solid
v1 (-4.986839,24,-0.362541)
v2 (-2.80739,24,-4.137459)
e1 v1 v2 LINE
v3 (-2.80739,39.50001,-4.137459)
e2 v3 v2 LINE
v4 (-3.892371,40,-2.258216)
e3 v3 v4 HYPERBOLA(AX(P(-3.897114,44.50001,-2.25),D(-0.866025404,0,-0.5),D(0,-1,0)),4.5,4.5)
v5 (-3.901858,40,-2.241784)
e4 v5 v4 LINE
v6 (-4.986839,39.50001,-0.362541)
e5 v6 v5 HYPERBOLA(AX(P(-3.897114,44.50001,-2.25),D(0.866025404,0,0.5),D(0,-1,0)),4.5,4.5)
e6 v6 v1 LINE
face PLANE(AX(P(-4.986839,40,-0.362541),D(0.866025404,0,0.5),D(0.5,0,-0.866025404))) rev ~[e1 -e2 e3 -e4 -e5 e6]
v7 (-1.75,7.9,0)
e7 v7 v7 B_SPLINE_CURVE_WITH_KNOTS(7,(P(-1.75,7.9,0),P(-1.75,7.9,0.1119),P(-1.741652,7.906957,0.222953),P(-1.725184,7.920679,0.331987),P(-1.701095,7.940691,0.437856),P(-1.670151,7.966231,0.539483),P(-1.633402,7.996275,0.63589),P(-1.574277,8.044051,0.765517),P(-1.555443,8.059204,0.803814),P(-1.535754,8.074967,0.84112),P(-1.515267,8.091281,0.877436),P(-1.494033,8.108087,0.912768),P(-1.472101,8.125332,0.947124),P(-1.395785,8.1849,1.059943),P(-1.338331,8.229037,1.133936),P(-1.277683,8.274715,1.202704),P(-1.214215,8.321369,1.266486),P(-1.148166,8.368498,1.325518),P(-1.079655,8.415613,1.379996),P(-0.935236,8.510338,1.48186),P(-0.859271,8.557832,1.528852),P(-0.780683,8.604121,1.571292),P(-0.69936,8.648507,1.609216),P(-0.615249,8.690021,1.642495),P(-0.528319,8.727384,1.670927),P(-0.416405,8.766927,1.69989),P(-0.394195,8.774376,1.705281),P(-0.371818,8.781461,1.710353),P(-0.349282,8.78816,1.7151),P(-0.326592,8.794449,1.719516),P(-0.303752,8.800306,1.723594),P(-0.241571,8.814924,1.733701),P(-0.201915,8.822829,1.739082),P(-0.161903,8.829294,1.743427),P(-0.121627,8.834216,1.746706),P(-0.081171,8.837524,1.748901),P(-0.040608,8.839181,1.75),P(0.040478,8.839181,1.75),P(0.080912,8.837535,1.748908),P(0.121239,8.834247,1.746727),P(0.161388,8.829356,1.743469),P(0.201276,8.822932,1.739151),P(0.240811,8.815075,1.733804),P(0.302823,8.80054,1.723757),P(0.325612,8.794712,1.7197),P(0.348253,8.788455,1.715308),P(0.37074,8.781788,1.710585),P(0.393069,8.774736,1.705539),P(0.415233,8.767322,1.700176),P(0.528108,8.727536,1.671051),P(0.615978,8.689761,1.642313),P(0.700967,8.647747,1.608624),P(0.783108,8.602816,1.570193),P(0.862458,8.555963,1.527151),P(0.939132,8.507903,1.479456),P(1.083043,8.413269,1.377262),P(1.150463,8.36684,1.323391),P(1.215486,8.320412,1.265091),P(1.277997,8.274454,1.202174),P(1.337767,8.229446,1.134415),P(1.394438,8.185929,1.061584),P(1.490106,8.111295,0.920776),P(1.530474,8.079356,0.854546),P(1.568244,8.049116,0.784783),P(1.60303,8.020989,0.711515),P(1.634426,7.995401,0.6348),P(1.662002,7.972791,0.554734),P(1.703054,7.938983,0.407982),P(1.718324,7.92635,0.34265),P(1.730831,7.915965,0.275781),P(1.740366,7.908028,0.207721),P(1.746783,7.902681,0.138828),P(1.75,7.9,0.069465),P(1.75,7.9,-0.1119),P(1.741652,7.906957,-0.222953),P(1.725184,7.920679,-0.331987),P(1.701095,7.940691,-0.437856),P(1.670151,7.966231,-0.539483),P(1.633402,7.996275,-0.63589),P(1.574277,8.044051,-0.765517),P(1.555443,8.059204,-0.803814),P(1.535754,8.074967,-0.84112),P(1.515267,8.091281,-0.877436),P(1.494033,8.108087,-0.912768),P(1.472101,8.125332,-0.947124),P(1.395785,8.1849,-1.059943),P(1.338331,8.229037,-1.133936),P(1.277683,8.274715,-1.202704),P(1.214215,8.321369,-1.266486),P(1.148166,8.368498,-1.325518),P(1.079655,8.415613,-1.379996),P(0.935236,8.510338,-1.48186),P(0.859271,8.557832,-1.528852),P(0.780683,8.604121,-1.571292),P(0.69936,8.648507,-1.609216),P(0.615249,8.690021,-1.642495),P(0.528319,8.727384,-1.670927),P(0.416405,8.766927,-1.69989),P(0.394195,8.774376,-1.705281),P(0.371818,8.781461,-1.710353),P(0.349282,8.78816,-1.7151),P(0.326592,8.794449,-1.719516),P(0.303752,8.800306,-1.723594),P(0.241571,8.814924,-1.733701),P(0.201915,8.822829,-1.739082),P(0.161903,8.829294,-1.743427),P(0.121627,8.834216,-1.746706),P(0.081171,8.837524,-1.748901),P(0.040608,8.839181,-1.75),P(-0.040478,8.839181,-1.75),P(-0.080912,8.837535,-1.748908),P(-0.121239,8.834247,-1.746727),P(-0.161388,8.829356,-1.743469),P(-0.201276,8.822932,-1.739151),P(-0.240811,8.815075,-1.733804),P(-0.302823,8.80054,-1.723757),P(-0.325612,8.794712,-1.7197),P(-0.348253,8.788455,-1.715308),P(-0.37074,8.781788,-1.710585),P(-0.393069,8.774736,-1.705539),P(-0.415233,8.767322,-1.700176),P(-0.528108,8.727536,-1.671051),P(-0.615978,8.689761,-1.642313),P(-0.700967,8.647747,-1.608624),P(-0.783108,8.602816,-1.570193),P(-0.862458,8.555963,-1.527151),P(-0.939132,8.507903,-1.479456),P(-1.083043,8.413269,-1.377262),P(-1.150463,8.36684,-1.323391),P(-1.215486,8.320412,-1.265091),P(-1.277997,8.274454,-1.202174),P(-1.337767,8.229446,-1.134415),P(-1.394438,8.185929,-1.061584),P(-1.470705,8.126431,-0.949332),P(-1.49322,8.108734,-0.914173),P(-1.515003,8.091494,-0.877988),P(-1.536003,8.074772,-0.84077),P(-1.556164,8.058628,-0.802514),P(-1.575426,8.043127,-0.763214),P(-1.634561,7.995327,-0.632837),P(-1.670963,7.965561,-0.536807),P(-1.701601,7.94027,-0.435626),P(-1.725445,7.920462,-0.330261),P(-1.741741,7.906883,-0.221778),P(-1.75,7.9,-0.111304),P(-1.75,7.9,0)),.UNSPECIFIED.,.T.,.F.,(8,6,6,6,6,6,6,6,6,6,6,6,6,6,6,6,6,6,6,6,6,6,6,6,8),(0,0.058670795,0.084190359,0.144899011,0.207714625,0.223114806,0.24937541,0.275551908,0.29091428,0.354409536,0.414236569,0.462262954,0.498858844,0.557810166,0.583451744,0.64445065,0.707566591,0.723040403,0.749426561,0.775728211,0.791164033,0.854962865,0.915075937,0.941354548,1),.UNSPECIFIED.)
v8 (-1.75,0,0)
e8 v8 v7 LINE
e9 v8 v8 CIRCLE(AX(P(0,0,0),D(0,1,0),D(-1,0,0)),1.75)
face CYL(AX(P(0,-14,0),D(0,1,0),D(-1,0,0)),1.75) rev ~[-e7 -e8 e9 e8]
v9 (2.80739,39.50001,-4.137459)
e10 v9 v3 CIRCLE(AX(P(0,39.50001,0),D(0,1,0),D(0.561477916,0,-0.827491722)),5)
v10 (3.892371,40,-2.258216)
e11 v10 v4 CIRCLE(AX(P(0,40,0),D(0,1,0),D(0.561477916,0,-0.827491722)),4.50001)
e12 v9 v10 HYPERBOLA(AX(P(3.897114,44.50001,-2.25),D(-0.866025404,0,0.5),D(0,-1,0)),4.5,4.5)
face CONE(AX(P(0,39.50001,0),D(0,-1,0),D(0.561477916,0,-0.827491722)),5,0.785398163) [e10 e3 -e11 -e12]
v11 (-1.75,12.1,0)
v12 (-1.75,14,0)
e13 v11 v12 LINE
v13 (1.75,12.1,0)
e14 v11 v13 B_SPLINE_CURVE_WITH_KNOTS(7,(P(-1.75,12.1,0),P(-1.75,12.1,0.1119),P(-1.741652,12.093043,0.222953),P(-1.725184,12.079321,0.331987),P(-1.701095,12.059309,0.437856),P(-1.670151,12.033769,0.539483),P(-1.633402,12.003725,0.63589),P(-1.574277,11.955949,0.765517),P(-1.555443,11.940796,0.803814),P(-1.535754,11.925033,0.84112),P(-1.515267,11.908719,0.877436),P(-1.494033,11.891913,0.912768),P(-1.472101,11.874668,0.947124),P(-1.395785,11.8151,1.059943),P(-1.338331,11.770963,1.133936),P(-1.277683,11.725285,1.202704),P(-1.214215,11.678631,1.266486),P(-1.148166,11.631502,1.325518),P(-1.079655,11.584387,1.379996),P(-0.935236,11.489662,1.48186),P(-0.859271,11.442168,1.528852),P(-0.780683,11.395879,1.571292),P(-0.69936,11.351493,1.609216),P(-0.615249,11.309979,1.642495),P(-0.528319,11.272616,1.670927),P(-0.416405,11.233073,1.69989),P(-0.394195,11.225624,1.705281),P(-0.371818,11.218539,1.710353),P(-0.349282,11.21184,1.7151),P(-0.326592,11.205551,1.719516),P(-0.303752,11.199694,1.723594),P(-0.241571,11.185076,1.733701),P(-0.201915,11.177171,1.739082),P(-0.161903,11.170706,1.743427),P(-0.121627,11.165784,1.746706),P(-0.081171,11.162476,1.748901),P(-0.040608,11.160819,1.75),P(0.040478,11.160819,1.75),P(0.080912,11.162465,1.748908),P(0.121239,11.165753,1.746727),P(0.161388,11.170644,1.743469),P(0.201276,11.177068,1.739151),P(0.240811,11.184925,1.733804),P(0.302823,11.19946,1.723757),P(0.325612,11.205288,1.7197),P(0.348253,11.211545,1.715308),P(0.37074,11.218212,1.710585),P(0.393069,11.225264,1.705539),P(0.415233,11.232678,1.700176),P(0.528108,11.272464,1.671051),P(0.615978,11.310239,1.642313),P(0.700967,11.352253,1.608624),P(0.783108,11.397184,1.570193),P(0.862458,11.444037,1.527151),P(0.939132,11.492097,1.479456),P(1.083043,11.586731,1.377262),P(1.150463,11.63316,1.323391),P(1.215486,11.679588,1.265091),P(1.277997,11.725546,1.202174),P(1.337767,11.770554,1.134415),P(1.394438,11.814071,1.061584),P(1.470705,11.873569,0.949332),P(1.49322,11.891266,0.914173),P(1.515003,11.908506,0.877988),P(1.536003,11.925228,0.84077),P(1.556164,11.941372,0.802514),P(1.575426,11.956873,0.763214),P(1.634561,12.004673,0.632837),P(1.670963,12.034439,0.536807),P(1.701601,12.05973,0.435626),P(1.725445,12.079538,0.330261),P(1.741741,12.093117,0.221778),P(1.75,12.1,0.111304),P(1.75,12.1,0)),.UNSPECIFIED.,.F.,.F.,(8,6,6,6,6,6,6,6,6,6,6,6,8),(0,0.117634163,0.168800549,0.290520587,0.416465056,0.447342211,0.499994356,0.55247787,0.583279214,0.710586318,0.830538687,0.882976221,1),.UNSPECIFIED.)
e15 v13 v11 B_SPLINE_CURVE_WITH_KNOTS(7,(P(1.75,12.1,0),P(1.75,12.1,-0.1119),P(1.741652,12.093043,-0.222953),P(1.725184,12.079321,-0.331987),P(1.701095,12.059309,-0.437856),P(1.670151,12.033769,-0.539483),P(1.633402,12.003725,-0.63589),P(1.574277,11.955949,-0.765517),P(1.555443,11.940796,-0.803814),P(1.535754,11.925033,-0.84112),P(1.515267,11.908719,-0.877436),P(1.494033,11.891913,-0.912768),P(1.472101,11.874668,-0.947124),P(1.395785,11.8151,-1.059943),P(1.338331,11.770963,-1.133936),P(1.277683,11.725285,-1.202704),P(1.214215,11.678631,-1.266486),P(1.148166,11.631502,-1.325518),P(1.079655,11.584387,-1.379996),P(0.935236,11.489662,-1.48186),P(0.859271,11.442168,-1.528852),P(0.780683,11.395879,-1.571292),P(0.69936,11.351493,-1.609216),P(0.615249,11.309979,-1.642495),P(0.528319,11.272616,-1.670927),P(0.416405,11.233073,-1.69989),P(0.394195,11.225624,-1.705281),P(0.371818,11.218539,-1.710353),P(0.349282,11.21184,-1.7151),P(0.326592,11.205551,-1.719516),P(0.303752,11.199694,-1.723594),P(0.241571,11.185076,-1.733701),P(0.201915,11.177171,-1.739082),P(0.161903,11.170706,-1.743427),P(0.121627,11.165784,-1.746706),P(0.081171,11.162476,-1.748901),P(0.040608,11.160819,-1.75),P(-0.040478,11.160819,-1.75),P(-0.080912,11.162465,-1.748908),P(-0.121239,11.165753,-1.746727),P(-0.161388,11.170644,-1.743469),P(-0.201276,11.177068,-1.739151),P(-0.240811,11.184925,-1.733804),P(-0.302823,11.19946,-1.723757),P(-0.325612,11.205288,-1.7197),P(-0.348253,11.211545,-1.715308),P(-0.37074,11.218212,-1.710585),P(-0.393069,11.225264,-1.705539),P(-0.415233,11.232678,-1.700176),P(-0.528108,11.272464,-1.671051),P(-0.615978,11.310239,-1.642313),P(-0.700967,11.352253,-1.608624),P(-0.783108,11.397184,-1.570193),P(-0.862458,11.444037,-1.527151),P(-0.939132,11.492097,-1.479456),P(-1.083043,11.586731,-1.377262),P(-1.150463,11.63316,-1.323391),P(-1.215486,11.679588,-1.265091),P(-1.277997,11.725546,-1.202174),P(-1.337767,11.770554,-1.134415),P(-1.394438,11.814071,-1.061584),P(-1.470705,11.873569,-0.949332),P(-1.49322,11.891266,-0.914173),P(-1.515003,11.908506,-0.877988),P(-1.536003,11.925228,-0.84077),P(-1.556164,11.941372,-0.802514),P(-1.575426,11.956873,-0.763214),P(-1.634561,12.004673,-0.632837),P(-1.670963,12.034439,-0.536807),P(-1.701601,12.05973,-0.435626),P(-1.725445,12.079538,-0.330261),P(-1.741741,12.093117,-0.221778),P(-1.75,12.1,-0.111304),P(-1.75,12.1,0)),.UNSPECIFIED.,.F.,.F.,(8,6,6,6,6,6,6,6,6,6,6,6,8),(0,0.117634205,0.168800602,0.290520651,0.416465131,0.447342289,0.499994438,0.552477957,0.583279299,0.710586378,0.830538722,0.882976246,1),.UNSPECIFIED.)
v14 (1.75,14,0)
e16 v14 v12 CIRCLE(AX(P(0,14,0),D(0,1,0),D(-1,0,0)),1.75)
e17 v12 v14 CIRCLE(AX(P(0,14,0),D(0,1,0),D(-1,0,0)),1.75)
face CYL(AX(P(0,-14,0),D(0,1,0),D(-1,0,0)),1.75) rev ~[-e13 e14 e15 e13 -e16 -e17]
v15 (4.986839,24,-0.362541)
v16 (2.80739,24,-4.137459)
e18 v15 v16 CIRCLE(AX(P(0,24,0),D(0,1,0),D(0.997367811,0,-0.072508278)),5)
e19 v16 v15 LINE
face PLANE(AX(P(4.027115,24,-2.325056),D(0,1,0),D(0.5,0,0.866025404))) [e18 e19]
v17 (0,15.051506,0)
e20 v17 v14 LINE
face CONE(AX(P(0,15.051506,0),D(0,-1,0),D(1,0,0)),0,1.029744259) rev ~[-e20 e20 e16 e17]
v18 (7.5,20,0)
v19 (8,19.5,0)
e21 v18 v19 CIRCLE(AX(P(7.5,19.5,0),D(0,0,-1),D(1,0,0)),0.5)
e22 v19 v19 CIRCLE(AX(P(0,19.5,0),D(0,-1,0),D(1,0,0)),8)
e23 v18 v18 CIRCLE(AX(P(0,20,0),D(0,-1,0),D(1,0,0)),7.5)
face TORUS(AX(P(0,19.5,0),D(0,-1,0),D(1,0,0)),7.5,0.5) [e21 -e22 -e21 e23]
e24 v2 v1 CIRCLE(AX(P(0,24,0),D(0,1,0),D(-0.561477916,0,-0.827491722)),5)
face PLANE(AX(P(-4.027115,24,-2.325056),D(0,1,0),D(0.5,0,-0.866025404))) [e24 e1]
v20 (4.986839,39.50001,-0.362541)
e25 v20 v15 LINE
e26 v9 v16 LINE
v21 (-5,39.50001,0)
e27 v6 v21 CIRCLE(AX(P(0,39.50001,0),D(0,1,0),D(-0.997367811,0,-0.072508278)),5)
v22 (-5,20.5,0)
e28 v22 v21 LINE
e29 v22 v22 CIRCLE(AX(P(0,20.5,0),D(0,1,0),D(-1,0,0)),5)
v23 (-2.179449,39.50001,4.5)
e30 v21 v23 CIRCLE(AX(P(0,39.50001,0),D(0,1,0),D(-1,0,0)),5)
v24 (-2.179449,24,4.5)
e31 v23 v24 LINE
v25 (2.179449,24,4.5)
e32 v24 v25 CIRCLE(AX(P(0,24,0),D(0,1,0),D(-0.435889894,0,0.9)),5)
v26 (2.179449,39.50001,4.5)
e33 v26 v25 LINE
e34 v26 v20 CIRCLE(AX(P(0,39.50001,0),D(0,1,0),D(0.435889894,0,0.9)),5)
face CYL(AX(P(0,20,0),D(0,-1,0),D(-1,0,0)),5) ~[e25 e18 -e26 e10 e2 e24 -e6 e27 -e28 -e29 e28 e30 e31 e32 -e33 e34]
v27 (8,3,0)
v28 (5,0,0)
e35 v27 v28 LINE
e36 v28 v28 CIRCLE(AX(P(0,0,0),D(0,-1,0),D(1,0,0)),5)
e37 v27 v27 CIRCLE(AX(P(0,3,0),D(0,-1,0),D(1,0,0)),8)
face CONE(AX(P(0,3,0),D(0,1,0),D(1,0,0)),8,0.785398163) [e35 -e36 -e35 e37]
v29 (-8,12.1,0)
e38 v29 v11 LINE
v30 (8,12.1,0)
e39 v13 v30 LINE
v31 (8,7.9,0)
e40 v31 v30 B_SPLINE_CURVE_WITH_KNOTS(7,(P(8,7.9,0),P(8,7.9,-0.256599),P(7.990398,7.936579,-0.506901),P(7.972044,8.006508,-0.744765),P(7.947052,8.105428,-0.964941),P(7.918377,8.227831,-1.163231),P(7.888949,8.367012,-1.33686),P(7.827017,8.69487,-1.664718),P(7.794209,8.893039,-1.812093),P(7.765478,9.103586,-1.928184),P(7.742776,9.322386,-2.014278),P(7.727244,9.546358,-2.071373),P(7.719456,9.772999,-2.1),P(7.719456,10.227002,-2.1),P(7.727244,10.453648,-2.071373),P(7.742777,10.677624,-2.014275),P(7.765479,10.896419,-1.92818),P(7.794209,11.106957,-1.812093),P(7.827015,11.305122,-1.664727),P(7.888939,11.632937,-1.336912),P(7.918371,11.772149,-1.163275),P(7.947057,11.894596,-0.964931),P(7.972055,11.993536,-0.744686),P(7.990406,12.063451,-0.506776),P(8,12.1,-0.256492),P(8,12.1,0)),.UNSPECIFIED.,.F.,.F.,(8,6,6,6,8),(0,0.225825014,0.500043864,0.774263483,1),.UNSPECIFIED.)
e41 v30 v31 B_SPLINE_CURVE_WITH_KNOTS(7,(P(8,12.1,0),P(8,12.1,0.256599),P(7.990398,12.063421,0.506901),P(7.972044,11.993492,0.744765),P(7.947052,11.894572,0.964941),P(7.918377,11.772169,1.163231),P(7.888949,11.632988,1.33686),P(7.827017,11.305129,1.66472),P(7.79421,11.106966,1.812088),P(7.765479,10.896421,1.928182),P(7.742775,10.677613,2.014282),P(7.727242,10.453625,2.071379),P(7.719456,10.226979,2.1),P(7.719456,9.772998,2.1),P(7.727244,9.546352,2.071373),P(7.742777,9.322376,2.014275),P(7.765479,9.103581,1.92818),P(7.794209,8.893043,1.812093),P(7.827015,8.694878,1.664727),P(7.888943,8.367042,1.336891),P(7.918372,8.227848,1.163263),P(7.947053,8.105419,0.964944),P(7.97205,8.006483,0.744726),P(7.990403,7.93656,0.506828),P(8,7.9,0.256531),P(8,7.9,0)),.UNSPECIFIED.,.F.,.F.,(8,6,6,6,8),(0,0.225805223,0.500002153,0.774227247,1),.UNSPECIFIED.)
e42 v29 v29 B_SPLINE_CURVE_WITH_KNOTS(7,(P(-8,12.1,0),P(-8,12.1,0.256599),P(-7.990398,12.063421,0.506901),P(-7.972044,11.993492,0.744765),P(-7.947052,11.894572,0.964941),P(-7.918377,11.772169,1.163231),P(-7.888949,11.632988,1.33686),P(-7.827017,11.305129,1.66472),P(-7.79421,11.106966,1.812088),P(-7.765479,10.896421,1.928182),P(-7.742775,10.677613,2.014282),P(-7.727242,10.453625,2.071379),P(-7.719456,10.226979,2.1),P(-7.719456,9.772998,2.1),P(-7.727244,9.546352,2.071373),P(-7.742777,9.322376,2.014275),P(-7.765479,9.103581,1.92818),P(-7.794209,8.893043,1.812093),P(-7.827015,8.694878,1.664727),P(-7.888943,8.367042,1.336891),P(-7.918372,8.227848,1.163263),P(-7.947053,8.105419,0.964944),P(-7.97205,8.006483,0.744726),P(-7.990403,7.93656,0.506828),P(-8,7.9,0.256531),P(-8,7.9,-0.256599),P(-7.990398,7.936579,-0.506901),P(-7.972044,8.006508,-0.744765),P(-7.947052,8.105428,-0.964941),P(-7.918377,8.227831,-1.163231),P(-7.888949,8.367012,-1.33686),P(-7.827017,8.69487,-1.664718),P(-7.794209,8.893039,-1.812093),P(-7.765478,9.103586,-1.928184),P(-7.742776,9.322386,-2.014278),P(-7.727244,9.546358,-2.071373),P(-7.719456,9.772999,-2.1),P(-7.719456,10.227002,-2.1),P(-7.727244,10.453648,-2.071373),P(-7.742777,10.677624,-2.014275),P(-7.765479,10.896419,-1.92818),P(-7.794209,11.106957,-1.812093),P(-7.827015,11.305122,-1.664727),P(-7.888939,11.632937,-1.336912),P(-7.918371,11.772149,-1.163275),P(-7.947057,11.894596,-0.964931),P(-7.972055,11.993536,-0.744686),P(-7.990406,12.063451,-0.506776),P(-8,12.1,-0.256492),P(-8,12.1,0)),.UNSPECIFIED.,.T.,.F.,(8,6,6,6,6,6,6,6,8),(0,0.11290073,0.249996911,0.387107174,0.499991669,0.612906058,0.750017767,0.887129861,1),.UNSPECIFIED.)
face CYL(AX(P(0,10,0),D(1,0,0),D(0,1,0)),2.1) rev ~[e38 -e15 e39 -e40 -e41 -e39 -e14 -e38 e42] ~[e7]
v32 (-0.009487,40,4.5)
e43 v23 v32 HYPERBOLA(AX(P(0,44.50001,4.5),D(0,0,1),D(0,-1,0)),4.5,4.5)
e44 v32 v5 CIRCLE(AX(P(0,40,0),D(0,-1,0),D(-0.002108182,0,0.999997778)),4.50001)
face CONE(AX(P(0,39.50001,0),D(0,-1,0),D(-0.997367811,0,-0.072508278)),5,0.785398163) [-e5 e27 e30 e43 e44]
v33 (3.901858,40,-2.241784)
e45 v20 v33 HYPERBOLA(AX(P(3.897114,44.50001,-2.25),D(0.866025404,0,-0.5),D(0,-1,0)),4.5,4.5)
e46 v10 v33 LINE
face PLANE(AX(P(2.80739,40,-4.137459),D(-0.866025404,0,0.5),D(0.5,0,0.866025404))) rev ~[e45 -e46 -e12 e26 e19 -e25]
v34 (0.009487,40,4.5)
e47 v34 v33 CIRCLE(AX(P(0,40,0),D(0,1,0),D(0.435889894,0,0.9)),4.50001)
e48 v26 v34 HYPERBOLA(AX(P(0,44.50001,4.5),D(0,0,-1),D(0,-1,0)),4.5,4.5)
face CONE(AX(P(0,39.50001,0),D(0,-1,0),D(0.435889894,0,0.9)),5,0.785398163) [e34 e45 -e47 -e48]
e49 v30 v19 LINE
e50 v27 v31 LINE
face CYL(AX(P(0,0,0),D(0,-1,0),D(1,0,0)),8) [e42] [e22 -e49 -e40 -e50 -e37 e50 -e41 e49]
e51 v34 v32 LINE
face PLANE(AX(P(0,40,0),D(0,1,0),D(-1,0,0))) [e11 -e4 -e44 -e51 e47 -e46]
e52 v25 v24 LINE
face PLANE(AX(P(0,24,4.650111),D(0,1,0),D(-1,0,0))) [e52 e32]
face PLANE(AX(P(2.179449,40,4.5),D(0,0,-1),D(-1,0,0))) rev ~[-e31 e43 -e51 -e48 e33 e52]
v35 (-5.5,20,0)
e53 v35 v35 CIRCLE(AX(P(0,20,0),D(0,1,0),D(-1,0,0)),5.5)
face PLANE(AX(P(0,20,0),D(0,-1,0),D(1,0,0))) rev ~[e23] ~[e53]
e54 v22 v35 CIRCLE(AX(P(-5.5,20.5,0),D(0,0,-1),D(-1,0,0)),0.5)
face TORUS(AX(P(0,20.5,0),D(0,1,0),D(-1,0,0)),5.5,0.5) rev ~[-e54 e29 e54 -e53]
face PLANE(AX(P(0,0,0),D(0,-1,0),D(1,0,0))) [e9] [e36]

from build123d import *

# Parameters (mm, degrees)
F0_R            = 8
F1_DEPTH        = 20
F2_R            = 5
F3_DEPTH        = 20
F5_DEPTH        = 16
F5_COPIES_COUNT = 3
F6_SIZE         = 0.49999
F7_R            = 0.5
F9_D            = 3.5
F9_DEPTH        = 14
F9_TIP          = 1.0515060833
F10_R           = 2.1
F11_DEPTH       = 8.25
F12_SIZE        = 3


# Not quite as in the source:
# - a fillet or chamfer is up to 0.001 mm smaller than in the source, because OpenCascade refuses the exact size
# - a pattern or mirror of a feature is missing from the dataset's text; its kind, count and spacing are read off the source's solid


with BuildPart() as f1:
    # F0 (on Front) → F1 (new body)
    with BuildSketch(Plane.XZ):
        Circle(F0_R)
    extrude(amount=-F1_DEPTH)

    # F2 (on face) → F3 (join)
    with BuildSketch(Plane(origin=(0, 20, 0), x_dir=(-1, 0, 0), z_dir=(0, 1, 0))):
        Circle(F2_R)
    extrude(amount=F3_DEPTH)

    # F4 (on face) → F5 (cut)
    with BuildSketch(Plane(origin=(0, 40, 0), x_dir=(-1, 0, 0), z_dir=(0, 1, 0))):
        with BuildLine():
            ThreePointArc((2.1794494718, 4.5), (0, 5), (-2.1794494718, 4.5))
            Line((-2.1794494718, 4.5), (2.1794494718, 4.5))
        make_face()
    f5 = extrude(amount=-F5_DEPTH, mode=Mode.SUBTRACT)

    # F5_copies: F5 ×3 about axis
    f5_copies_axis = Axis((0, 0, 0), (0, 1, 0))
    for i in range(1, F5_COPIES_COUNT):
        add(f5.rotate(f5_copies_axis, i * 360 / F5_COPIES_COUNT), mode=Mode.SUBTRACT)

    # F6 (size 0.5 in the source; OpenCascade refuses exactly that, so slightly less here)
    f6_edges = [f1.edges().sort_by_distance(p)[0] for p in [
        (4.330127, 40, 2.5),
        (-4.996709, 40, -0.18139),
        (0, 40, -5),
        (-4.236582, 40, 2.655443),
    ]]
    chamfer(f6_edges, length=F6_SIZE)

    # F7
    f7_edges = [f1.edges().sort_by_distance(p)[0] for p in [
        (-8, 20, 0),
        (5, 20, 0),
    ]]
    fillet(f7_edges, radius=F7_R)

    # F9
    with Locations(Plane.XZ):
        with Locations((0, 0)):
            Hole(F9_D / 2, depth=F9_DEPTH)
            with Locations((0, 0, -(F9_DEPTH + F9_TIP / 2))):  # 118° drill point
                Cone(0, F9_D / 2, F9_TIP, mode=Mode.SUBTRACT)

    # F10 (on Right) → F11 (cut, symmetric)
    with BuildSketch(Plane.YZ):
        with Locations((10, 0)):
            Circle(F10_R)
    extrude(amount=F11_DEPTH, both=True, mode=Mode.SUBTRACT)

    # F12
    f12_edges = [f1.edges().sort_by_distance(p)[0] for p in [
        (-8, 0, 0),
    ]]
    chamfer(f12_edges, length=F12_SIZE)


solid = f1.part
